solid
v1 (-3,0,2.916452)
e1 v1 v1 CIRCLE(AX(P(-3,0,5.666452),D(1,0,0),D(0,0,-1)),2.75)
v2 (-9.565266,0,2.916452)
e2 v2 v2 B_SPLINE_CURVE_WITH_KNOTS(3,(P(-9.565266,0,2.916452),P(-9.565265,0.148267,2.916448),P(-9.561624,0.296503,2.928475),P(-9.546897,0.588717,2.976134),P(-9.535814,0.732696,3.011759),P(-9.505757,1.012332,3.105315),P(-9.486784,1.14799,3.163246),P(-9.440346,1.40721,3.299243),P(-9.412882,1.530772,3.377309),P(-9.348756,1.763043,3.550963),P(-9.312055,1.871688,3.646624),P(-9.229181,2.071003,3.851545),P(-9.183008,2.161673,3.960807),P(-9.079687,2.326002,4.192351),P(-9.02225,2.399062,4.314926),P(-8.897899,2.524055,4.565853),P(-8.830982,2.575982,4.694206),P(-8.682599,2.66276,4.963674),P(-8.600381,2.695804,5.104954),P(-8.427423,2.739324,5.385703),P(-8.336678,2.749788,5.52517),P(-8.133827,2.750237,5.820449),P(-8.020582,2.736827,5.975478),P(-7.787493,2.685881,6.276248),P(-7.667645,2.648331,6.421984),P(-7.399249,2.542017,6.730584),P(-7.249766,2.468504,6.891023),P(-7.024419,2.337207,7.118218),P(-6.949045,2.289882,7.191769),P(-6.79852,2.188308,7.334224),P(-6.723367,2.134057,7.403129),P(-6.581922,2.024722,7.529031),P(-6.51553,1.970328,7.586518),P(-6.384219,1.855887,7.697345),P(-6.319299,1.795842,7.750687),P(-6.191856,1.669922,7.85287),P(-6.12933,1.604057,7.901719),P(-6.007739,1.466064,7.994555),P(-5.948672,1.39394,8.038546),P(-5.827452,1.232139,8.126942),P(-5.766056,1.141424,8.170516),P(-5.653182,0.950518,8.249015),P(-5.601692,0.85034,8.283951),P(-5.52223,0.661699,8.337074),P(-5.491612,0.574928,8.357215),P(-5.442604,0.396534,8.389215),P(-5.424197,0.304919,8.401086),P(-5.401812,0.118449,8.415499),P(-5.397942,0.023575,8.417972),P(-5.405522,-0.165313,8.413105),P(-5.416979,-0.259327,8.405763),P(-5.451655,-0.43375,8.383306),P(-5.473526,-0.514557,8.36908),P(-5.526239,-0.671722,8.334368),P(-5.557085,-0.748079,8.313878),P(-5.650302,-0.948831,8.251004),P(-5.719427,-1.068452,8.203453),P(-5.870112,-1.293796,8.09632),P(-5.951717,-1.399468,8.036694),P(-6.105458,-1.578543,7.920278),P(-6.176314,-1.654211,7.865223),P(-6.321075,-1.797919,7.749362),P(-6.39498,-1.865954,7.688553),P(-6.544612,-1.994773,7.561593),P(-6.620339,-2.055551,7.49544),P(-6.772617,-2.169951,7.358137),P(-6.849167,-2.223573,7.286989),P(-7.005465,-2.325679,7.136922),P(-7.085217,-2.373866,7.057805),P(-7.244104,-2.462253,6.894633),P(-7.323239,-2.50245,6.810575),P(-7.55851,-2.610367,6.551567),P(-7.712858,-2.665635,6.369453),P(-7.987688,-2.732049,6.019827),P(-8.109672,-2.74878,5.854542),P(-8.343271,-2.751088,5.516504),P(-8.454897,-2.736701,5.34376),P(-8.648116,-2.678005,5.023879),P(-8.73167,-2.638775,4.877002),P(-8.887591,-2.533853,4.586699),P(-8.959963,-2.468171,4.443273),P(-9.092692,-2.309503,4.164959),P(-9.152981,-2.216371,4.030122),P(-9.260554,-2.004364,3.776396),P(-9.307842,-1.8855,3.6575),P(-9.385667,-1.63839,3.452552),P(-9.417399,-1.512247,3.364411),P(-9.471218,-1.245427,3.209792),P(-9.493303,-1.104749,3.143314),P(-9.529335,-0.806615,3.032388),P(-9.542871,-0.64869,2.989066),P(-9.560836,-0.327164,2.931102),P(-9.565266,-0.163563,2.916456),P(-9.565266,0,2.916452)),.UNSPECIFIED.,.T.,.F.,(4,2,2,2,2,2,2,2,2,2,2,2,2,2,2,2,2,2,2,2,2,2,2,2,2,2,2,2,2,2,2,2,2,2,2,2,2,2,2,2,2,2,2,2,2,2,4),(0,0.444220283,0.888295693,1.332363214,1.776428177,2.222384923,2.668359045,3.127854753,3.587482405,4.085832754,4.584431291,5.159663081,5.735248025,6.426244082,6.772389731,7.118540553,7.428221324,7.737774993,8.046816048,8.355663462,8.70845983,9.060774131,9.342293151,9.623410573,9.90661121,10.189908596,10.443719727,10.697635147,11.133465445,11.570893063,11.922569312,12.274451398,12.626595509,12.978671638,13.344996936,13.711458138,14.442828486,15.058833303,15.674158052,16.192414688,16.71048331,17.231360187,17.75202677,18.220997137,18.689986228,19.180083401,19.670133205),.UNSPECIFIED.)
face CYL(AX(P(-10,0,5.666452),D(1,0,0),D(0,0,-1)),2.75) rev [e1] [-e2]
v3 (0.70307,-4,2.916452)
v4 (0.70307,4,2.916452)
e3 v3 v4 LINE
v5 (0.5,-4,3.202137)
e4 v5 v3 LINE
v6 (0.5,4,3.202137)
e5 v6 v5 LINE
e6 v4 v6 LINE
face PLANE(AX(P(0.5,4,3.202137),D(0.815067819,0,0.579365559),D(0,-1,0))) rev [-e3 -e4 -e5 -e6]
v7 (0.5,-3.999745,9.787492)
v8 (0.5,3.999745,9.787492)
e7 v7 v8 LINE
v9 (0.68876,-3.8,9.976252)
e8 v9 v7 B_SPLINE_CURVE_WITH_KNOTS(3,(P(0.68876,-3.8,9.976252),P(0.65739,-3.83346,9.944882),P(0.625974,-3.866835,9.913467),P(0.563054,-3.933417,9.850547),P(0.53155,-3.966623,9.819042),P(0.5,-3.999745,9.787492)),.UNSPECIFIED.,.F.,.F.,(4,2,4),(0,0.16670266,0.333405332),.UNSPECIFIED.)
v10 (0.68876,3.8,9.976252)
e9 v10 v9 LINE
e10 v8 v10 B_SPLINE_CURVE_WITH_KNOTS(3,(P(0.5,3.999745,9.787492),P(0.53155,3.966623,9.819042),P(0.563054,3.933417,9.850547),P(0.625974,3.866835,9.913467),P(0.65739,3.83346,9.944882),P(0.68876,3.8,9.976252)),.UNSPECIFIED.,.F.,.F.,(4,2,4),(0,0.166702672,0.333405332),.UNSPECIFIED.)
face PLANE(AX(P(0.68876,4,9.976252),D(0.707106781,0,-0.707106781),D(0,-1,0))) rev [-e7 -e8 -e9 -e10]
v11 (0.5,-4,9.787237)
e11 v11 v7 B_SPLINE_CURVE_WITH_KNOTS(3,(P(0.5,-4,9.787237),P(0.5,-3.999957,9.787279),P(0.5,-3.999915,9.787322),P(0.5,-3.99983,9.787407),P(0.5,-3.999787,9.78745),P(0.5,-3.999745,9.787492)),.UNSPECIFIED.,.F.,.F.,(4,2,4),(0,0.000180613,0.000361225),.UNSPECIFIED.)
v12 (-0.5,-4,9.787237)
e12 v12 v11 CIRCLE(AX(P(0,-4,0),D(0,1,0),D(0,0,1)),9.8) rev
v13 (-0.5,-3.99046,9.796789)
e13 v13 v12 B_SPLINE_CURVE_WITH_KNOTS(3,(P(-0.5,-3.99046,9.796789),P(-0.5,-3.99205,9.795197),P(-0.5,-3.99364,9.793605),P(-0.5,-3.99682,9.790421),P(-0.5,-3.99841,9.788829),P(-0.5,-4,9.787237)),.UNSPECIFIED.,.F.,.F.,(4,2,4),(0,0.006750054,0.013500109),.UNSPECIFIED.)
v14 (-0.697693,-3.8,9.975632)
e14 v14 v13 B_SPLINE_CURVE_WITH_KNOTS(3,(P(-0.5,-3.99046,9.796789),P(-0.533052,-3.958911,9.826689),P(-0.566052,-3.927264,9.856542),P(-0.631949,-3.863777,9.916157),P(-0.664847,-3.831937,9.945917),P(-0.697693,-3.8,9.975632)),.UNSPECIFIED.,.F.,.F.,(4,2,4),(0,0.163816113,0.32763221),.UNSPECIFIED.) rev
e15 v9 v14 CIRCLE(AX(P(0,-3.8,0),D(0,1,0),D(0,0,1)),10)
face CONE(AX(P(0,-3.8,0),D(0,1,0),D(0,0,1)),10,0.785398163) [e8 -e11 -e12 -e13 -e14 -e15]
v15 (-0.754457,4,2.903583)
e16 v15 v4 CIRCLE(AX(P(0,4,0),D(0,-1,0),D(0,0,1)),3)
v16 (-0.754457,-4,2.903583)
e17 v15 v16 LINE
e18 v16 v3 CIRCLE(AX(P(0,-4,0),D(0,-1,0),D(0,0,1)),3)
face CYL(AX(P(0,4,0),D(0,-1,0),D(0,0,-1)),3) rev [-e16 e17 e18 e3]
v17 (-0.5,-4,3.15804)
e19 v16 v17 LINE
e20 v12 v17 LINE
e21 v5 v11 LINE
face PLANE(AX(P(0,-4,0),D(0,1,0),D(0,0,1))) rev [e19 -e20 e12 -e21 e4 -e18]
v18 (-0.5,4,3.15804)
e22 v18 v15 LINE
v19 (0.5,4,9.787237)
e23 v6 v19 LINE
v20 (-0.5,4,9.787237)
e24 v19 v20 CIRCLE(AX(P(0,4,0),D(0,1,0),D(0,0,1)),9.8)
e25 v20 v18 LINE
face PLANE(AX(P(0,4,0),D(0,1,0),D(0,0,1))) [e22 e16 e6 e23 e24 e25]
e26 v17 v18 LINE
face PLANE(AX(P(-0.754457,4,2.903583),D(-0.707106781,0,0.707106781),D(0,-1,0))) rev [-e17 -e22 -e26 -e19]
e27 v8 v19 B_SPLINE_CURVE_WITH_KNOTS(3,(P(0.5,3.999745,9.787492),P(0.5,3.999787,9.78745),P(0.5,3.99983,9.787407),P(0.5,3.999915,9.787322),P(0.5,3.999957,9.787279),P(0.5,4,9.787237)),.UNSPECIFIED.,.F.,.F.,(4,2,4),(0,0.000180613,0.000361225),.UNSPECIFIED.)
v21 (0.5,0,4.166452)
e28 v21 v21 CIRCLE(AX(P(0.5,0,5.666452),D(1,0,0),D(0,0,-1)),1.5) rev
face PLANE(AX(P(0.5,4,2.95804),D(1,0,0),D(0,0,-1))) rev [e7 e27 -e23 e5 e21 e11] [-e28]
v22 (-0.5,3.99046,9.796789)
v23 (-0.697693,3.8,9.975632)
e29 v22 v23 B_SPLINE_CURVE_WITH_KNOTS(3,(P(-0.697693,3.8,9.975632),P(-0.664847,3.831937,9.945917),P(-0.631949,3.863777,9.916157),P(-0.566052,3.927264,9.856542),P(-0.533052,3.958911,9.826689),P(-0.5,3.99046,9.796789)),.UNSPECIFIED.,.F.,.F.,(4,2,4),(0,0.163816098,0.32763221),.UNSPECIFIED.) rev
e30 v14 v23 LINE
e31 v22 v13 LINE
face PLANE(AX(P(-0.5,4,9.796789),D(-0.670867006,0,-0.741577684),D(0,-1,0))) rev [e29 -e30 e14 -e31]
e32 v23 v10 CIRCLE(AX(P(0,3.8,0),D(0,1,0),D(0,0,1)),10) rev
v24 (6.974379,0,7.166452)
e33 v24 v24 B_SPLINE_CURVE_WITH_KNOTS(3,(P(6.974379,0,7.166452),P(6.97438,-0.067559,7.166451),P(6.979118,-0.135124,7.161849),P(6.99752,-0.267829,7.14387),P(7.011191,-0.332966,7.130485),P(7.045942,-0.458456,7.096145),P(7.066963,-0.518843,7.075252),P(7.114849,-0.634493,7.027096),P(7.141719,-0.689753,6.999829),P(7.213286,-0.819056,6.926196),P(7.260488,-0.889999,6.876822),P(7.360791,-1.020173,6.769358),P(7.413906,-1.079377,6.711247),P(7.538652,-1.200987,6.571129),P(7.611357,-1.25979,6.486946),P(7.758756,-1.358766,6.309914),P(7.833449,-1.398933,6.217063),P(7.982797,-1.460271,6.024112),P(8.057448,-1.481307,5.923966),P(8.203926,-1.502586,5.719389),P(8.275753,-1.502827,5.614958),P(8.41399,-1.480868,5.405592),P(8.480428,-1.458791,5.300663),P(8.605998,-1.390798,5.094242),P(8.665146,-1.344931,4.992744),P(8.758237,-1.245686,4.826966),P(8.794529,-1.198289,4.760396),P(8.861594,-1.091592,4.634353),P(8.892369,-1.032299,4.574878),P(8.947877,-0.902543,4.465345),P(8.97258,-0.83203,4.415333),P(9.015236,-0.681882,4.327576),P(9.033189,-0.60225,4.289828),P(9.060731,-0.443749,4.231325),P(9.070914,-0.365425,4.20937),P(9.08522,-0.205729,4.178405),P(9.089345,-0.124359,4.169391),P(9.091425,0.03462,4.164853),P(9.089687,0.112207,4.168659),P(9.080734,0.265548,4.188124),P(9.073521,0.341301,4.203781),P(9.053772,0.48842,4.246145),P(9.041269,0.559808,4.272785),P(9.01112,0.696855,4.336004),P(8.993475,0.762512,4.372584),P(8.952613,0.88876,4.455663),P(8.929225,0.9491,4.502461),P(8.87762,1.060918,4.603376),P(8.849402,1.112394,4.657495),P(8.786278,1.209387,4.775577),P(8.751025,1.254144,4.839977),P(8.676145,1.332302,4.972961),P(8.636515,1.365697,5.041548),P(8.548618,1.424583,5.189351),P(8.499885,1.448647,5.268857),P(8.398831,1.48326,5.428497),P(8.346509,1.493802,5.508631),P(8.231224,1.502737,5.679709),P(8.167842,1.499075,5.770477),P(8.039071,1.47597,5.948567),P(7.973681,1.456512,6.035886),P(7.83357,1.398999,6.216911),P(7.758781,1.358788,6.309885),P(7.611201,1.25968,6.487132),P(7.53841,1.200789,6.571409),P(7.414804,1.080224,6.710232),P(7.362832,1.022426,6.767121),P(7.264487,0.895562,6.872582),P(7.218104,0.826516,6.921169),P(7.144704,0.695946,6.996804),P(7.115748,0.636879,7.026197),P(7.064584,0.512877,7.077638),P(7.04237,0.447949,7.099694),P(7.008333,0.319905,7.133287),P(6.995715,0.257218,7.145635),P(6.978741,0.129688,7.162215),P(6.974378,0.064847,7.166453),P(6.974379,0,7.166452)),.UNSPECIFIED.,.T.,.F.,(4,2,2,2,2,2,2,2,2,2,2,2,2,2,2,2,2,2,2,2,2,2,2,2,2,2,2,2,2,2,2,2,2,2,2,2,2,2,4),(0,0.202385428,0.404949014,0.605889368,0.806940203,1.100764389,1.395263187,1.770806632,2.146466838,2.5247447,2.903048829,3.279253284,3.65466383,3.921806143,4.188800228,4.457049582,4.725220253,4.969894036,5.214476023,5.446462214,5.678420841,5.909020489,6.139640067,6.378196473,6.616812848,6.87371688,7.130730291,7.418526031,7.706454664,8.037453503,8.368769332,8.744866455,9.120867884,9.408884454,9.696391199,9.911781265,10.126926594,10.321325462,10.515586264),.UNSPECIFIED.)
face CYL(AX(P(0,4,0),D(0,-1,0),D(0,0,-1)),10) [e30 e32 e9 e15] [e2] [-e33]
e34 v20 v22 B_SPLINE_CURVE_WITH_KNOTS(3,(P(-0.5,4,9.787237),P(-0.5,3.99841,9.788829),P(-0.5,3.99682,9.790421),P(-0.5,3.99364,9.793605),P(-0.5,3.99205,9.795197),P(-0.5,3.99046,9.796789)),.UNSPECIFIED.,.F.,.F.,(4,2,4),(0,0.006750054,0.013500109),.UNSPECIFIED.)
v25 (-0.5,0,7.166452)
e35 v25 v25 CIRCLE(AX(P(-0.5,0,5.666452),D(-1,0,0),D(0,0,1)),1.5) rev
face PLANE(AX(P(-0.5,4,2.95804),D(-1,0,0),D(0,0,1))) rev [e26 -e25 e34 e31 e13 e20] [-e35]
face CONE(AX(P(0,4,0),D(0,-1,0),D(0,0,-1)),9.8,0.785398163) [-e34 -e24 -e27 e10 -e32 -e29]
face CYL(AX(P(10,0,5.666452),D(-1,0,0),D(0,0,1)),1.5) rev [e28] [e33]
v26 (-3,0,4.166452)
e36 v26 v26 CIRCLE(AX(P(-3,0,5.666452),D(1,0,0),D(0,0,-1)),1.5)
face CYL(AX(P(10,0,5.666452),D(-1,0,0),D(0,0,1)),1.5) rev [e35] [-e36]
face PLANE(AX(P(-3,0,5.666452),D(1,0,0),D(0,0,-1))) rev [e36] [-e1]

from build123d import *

# Parameters (mm, degrees)
EXTRUDE_1_DEPTH     = 4
CHAMFER_1_SIZE      = 0.2
CHAMFER_1_SIZE_2    = 0.19070336
CHAMFER_1_SIZE_3    = 0.244096934
SKETCH_2_R          = 2.75
CUT_EXTRUDE_1_DEPTH = 17.881943016
SKETCH_3_R          = 1.5
CUT_EXTRUDE_2_DEPTH = 17.881943152


with BuildPart() as part:
    # 草图1 → 凸台-拉伸1 (new, symmetric)
    with BuildSketch(Plane(origin=(0, 0, 0), x_dir=(1, 0, 0), z_dir=(0, 1, 0))):
        with BuildLine():
            Line((-0.5, -2.958039892), (-0.5, -9.987492178))
            ThreePointArc((-0.5, -9.987492178), (0, 10), (0.5, -9.987492178))
            Line((0.5, -9.987492178), (0.5, -2.958039892))
            ThreePointArc((0.5, -2.958039892), (0, 3), (-0.5, -2.958039892))
        make_face()
    extrude(amount=EXTRUDE_1_DEPTH, both=True)

    # 倒角1
    # the kernel refuses this chamfer: 0.244096934, 0.2, 0.19070336 mm, written as the material it takes off along each edge
    with BuildSketch(Plane(origin=(0, 4, 0), x_dir=(-0.0031415874858795653, 0, 0.9999950652018581), z_dir=(0.9999950652018581, 0, 0.0031415874858795653))) as chamfer_1_piece_1:
        Polygon((10 - CHAMFER_1_SIZE, 0), (10, CHAMFER_1_SIZE), (10, 0), align=None)
    revolve(axis=Axis((0, 4, 0), (0, -1, 0)), revolution_arc=359.64, mode=Mode.SUBTRACT)
    with BuildSketch(Plane(origin=(0, -4, 0), x_dir=(-0.0031415874858795653, 0, 0.9999950652018581), z_dir=(0.9999950652018581, 0, 0.0031415874858795653))) as chamfer_1_piece_2:
        Polygon((10, -CHAMFER_1_SIZE), (10 - CHAMFER_1_SIZE, 0), (10, 0), align=None)
    revolve(axis=Axis((0, -4, 0), (0, -1, 0)), revolution_arc=359.64, mode=Mode.SUBTRACT)
    with BuildSketch(Plane(origin=(-0.5, -4.671168093, 2.958039892), x_dir=(0, 0, 1), z_dir=(0, 1, 0))) as chamfer_1_piece_3:
        with BuildLine():
            Line((CHAMFER_1_SIZE, 0), (-0.054456761, -0.254456761))
            ThreePointArc((-0.054456761, -0.254456761), (-0.025330071, -0.131833133), (0, 0))
            Line((0, 0), (CHAMFER_1_SIZE, 0))
        make_face()
    extrude(amount=9.342336186, mode=Mode.SUBTRACT)
    with BuildSketch(Plane(origin=(-0.5, 4.50932304, 9.987492178), x_dir=(0, 0, -1), z_dir=(0, -1, 0))) as chamfer_1_piece_4:
        with BuildLine():
            Line((CHAMFER_1_SIZE_2 * 1.00000000187, 0), (0.01186065, -0.197693077))
            ThreePointArc((0.01186065, -0.197693077), (0.005608956, -0.101670471), (0, 0))
            Line((0, 0), (CHAMFER_1_SIZE_2 * 1.00000000187, 0))
        make_face()
    extrude(amount=9.01864608, mode=Mode.SUBTRACT)
    with BuildSketch(Plane(origin=(0.5, 4.514336598, 9.987492178), x_dir=(0, 0, -1), z_dir=(0, -1, 0))) as chamfer_1_piece_5:
        with BuildLine():
            Line((CHAMFER_1_SIZE, 0), (0.011239899, 0.188760101))
            ThreePointArc((0.011239899, 0.188760101), (0.005331916, 0.097056531), (0, 0))
            Line((0, 0), (CHAMFER_1_SIZE, 0))
        make_face()
    extrude(amount=9.028673195, mode=Mode.SUBTRACT)
    with BuildSketch(Plane(origin=(0.5, -4.630296565, 2.958039892), x_dir=(0, 0, 1), z_dir=(0, 1, 0))) as chamfer_1_piece_6:
        with BuildLine():
            Line((CHAMFER_1_SIZE_3 * 0.999999998038, 0), (-0.041587873, 0.203070142))
            ThreePointArc((-0.041587873, 0.203070142), (-0.019758938, 0.105396594), (0, 0))
            Line((0, 0), (CHAMFER_1_SIZE_3 * 0.999999998038, 0))
        make_face()
    extrude(amount=9.26059313, mode=Mode.SUBTRACT)

    # 草图2 → 切除-拉伸1 (cut, through all)
    with BuildSketch(Plane(origin=(-3, 0, 0), x_dir=(0, 0, -1), z_dir=(1, 0, 0))):
        with Locations((-5.666452018, 0)):
            Circle(SKETCH_2_R)
    extrude(amount=-CUT_EXTRUDE_1_DEPTH, mode=Mode.SUBTRACT)

    # 草图3 → 切除-拉伸2 (cut, through all)
    with BuildSketch(Plane(origin=(-3, 0, 0), x_dir=(0, 0, -1), z_dir=(1, 0, 0))):
        with Locations(Location((-5.666452018, 0, 0), (0, 0, 180))):
            Circle(SKETCH_3_R)
    extrude(amount=CUT_EXTRUDE_2_DEPTH, mode=Mode.SUBTRACT)


solid = part.part
